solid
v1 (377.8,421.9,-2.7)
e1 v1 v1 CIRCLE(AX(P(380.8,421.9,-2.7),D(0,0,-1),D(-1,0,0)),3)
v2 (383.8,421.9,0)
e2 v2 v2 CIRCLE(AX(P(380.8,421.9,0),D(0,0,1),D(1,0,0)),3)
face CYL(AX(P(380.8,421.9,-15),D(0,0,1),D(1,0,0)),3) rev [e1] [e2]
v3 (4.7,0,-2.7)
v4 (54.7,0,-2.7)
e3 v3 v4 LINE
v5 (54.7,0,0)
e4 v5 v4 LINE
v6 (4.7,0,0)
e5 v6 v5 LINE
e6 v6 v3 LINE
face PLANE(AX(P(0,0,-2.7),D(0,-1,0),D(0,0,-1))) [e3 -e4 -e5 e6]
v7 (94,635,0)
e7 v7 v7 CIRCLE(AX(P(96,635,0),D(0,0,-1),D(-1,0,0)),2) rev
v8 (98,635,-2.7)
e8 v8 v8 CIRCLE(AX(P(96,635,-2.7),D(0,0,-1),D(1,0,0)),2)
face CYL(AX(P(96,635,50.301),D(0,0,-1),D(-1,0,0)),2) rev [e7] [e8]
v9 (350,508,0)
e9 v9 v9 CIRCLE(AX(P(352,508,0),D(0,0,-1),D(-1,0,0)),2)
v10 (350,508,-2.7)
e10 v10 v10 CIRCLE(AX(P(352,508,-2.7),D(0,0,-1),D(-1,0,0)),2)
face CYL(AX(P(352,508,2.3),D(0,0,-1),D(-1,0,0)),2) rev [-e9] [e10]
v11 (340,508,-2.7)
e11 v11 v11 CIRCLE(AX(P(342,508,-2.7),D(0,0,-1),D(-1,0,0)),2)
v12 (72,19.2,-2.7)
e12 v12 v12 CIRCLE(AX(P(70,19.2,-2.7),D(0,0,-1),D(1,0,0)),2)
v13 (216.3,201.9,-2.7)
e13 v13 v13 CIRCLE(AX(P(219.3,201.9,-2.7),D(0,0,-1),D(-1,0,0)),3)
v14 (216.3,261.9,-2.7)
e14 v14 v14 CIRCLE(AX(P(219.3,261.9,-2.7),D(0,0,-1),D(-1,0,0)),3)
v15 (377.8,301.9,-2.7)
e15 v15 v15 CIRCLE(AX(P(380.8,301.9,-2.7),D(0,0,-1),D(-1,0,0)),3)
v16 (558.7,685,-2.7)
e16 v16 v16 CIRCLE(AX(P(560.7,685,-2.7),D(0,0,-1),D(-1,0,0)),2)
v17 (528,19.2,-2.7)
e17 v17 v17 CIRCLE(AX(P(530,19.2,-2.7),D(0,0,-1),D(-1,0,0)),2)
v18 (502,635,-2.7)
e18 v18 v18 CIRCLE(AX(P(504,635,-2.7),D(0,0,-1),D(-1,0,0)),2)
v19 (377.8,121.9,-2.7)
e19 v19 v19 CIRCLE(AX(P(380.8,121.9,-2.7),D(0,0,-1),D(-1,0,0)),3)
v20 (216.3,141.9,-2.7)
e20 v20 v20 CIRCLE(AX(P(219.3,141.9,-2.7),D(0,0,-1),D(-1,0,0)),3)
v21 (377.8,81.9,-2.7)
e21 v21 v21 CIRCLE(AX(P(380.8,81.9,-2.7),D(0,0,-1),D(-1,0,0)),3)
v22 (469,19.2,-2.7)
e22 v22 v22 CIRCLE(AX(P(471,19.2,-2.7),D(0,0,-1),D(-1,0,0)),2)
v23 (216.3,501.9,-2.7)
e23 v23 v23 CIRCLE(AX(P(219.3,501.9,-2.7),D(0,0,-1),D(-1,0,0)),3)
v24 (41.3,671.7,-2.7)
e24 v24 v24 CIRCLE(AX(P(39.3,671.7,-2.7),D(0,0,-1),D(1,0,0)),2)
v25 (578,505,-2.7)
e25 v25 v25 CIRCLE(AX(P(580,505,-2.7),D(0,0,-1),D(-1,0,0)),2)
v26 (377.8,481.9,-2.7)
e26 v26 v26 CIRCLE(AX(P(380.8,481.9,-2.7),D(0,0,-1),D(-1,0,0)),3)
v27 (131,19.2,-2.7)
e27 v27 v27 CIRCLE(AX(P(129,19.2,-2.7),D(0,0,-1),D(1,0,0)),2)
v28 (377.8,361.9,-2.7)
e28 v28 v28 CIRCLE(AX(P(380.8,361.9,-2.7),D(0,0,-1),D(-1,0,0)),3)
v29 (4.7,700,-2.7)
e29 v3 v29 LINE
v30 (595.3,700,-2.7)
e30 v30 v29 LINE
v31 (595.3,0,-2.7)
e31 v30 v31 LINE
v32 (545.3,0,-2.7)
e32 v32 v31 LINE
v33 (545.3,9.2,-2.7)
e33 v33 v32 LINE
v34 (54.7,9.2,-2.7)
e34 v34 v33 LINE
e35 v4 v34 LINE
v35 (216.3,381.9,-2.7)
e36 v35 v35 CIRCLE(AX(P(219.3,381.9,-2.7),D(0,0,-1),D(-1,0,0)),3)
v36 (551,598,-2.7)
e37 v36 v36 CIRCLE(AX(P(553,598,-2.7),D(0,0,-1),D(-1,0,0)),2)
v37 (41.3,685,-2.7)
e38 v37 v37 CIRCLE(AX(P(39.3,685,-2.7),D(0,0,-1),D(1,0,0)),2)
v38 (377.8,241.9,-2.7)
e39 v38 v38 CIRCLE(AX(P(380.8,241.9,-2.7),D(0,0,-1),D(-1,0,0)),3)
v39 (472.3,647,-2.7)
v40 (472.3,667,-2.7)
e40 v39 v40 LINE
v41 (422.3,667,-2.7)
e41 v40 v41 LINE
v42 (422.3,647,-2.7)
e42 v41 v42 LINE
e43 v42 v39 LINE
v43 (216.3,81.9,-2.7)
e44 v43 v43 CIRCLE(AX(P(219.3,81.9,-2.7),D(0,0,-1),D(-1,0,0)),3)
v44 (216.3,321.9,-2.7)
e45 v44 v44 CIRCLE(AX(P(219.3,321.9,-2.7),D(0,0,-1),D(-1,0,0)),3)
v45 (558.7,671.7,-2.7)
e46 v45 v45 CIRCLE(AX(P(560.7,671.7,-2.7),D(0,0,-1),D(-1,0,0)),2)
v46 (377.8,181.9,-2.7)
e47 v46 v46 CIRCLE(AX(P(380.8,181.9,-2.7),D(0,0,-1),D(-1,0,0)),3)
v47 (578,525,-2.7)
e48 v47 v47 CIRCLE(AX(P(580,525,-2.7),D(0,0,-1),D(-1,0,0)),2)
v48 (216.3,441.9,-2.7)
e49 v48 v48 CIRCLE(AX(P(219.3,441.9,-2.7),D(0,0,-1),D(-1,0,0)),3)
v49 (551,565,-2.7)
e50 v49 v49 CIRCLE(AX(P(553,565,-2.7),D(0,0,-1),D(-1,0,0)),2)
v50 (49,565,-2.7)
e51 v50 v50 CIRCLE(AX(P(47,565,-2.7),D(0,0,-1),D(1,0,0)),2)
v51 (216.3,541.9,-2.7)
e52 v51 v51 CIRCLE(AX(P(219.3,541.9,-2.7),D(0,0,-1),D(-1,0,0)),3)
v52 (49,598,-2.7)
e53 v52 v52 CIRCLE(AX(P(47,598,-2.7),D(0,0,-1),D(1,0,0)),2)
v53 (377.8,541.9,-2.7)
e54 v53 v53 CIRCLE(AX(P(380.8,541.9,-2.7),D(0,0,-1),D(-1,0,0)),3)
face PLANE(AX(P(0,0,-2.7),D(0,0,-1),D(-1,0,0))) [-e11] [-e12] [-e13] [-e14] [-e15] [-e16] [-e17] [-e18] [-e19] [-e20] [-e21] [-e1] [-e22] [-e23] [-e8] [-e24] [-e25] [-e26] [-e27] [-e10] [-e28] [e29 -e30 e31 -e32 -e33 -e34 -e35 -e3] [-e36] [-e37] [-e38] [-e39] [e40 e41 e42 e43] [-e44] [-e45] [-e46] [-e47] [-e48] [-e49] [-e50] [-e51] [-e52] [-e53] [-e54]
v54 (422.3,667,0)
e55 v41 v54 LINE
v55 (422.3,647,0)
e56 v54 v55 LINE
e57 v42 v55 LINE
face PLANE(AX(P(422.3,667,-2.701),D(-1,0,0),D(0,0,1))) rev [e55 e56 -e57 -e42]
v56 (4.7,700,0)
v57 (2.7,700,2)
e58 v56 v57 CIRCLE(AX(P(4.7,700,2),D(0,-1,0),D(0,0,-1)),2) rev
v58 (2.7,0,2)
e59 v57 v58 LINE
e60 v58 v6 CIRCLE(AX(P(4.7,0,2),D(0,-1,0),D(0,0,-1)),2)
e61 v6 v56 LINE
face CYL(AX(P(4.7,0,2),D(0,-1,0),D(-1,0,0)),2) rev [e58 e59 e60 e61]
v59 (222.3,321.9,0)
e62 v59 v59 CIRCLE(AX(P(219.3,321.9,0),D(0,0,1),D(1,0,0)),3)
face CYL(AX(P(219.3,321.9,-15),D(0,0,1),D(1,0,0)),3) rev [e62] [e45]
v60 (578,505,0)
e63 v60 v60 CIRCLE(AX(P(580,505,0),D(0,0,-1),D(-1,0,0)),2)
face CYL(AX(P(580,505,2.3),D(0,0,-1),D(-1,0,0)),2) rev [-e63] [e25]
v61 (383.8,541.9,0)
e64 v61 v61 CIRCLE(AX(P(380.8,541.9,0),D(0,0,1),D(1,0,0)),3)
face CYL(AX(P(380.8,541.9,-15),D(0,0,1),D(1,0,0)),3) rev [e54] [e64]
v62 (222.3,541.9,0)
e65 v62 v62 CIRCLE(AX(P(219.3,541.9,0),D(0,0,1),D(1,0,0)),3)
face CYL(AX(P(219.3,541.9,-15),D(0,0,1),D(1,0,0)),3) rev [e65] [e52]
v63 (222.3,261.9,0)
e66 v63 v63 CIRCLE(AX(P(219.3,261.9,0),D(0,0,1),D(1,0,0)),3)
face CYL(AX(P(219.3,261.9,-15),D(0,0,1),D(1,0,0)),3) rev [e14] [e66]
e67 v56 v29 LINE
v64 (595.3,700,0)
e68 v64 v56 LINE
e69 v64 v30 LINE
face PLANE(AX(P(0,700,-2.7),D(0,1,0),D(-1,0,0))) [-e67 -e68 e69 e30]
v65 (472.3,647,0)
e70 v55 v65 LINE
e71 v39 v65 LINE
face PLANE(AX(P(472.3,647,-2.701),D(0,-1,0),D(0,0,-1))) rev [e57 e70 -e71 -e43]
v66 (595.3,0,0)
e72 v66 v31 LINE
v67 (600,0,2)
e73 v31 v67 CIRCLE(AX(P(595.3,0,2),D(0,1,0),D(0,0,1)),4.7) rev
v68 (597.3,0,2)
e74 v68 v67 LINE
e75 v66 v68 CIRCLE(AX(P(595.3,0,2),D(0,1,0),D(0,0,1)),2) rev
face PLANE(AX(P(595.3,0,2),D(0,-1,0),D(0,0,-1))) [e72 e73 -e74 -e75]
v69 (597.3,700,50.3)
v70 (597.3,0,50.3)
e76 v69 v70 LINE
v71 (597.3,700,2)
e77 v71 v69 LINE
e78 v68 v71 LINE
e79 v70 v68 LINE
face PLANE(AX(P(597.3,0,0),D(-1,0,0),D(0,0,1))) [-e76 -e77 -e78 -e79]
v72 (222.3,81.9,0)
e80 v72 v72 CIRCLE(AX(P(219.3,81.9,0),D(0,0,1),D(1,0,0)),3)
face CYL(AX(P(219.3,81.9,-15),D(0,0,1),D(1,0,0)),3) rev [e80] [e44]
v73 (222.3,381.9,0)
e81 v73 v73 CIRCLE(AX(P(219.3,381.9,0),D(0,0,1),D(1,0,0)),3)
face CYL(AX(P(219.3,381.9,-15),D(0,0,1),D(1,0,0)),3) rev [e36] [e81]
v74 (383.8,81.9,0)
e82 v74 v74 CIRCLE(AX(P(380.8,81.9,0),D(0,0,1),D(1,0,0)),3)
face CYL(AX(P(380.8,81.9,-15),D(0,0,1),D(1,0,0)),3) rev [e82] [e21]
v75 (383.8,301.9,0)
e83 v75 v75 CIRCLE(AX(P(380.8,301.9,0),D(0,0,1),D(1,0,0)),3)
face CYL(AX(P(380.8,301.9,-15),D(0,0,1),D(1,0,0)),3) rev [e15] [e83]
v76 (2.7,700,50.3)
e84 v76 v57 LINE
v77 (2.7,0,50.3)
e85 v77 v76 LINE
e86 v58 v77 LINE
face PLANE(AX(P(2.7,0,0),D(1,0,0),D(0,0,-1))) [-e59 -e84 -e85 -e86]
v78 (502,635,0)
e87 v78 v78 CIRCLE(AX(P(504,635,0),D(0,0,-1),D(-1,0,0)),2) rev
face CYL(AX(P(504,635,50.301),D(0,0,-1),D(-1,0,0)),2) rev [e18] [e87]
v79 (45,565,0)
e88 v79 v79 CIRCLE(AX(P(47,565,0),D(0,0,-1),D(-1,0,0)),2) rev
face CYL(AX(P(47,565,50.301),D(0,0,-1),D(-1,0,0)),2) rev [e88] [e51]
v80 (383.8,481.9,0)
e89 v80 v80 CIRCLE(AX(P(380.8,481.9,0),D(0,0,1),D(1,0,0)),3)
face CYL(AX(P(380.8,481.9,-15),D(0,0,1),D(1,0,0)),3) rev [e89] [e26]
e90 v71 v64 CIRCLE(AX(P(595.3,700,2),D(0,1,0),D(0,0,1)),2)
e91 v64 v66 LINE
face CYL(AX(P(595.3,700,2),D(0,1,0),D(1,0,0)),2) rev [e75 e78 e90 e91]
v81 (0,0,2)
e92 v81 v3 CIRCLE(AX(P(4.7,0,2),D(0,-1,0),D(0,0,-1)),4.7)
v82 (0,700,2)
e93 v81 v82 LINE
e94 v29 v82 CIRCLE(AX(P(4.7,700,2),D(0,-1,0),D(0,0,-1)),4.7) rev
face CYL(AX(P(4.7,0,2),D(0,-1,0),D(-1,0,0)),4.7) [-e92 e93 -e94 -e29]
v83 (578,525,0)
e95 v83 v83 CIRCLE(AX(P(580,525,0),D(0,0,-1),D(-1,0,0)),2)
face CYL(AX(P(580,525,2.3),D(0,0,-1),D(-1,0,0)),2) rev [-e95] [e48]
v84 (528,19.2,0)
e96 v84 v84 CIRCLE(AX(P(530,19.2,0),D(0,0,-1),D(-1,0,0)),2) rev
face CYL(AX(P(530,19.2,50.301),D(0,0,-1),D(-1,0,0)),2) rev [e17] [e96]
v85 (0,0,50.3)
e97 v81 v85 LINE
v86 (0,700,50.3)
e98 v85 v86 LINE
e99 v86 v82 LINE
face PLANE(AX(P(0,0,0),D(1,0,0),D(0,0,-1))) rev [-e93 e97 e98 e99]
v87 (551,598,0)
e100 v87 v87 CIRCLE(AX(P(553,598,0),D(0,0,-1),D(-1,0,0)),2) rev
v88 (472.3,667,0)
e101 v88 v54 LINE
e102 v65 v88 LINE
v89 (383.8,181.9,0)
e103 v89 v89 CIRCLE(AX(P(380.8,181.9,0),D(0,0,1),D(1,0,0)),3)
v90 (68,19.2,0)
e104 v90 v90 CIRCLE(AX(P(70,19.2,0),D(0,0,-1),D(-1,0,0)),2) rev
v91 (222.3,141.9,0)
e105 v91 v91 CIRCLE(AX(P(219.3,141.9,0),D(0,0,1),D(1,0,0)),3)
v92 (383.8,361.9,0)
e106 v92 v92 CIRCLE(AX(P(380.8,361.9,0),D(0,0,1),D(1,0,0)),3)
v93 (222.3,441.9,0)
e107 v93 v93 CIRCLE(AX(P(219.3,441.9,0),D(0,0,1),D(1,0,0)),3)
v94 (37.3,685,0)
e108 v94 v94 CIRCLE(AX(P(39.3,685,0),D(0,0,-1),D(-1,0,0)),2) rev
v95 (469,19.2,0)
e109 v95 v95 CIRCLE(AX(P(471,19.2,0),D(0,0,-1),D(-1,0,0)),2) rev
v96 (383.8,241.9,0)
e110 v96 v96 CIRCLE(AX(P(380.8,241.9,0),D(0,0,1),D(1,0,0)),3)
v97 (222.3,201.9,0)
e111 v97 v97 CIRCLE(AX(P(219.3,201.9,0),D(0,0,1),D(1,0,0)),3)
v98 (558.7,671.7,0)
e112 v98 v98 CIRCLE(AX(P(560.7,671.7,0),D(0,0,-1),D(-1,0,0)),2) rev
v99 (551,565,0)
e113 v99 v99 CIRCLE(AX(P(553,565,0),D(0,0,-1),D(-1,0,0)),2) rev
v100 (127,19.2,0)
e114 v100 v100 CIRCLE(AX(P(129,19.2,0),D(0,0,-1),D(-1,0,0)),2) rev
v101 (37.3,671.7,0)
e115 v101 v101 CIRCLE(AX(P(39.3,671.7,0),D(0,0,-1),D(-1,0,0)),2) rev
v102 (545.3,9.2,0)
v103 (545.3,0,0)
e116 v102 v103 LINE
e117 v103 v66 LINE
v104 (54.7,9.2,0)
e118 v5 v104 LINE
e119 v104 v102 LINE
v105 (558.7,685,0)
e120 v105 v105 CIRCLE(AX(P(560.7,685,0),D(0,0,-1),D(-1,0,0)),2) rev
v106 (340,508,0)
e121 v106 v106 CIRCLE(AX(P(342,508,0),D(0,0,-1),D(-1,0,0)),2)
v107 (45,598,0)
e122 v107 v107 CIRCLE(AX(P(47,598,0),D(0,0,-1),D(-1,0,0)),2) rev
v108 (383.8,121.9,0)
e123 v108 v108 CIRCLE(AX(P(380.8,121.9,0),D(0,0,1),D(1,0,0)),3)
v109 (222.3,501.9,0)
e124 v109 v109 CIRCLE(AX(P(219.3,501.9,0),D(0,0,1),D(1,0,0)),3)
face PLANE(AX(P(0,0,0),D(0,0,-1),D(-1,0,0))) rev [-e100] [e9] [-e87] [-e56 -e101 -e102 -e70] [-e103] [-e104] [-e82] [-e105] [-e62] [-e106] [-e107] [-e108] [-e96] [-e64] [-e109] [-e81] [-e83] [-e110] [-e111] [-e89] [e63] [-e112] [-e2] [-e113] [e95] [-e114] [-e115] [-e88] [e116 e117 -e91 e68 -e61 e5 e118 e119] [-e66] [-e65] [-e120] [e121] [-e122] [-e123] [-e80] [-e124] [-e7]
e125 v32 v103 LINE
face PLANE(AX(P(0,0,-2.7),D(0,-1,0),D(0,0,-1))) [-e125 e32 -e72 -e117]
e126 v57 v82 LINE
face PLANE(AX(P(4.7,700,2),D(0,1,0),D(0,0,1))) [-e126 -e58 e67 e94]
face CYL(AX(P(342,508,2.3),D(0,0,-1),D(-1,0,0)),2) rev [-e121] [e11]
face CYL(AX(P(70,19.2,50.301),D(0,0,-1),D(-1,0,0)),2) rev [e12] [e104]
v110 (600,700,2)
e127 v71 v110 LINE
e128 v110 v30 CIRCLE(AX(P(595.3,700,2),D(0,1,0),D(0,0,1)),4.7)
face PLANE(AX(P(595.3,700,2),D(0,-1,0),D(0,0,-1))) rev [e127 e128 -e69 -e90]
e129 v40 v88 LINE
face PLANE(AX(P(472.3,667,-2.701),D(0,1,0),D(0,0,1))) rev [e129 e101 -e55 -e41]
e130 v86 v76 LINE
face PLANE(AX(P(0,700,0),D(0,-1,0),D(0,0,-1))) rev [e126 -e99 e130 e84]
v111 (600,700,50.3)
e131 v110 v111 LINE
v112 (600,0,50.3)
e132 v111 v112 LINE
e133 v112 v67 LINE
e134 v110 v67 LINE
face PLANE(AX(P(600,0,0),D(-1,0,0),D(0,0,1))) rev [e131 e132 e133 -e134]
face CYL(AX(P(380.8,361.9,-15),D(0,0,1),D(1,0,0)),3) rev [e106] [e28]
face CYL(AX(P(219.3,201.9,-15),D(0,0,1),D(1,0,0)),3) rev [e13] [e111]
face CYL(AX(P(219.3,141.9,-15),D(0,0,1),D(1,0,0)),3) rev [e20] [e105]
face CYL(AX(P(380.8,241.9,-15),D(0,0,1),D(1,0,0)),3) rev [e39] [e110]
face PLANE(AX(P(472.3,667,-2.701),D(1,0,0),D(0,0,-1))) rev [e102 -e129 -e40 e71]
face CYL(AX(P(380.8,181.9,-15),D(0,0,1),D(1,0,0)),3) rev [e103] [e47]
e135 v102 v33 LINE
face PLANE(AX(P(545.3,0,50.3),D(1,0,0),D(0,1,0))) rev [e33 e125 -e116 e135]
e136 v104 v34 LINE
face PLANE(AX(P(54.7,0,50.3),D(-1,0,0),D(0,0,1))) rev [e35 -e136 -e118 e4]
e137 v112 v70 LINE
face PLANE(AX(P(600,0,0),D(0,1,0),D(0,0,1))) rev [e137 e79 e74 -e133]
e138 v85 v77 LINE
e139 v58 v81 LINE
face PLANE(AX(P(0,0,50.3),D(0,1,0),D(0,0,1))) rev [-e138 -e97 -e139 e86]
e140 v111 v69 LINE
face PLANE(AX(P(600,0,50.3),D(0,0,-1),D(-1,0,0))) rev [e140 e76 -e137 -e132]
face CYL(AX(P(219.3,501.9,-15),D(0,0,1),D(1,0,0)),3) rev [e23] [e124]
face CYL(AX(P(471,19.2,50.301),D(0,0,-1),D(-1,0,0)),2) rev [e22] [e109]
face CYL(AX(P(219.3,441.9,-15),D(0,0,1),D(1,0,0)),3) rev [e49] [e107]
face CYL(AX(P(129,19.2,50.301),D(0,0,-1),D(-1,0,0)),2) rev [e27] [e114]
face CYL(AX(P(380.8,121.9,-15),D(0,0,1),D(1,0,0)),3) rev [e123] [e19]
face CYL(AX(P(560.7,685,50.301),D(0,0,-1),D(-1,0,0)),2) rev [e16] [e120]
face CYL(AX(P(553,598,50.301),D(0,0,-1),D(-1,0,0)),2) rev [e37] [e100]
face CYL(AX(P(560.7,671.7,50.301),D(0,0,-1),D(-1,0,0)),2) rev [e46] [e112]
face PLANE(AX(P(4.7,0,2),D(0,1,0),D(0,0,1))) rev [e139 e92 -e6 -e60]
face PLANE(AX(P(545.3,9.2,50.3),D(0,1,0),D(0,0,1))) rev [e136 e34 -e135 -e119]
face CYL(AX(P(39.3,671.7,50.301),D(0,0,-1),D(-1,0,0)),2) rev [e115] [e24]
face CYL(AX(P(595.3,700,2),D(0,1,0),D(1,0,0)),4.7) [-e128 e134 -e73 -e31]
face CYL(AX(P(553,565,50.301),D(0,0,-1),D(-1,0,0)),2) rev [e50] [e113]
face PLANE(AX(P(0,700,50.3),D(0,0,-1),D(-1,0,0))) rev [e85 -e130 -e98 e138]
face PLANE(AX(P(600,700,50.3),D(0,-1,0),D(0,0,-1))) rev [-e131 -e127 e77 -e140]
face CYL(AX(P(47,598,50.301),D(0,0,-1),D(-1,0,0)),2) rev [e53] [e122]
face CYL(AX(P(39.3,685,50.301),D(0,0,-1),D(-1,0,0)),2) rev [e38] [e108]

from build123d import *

# Parameters (mm, degrees)
SKETCH1_W                      = 600
SKETCH1_H                      = 700
BASE_FLANGE1_DEPTH             = 2.7
EDGE_FLANGE1_STRIP_W           = 14.8
EDGE_FLANGE1_STRIP_H           = 2.7
EDGE_FLANGE1_STRIP_CUT_DEPTH   = 700
EDGE_FLANGE1_STRIP_2_W         = 14.8
EDGE_FLANGE1_STRIP_2_H         = 2.7
EDGE_FLANGE1_STRIP_CUT_2_DEPTH = 700
EDGE_FLANGE1_DEPTH             = 700
EDGE_FLANGE1_BEND_DEPTH        = 700
CUT_EXTRUDE1_REACH             = 925.326
SKETCH12_W                     = 50
SKETCH12_H                     = 20
SKETCH13_W                     = 490.6
SKETCH13_H                     = 9.2
CUT_EXTRUDE2_DEPTH             = 924.476583352
CUT_EXTRUDE6_REACH             = 925.477
SKETCH17_R                     = 2
CUT_EXTRUDE7_START             = -2.7
CUT_EXTRUDE7_OUTLINE_R         = 2
CUT_EXTRUDE7_DEPTH             = 2.7
CUT_EXTRUDE10_START            = -2.7
CUT_EXTRUDE10_OUTLINE_R        = 3
CUT_EXTRUDE10_DEPTH            = 2.7


# Read off the part's stored shape, not the designer's step: Cut-Extrude7, Cut-Extrude10
# Sheet-metal steps are written as plain solids
with BuildPart() as part:
    # Sketch1 → Base-Flange1 (new body)
    with BuildSketch(Plane.XY):
        with Locations((300, 350)):
            Rectangle(SKETCH1_W, SKETCH1_H)
    extrude(amount=-BASE_FLANGE1_DEPTH)

    # Edge-Flange1 strip (across the edge) → Edge-Flange1 strip cut (cut)
    with BuildSketch(Plane(origin=(600, 0, 0), x_dir=(-1, 0, 0), z_dir=(0, 1, 0))):
        with Locations((-2.7, -1.35)):
            Rectangle(EDGE_FLANGE1_STRIP_W, EDGE_FLANGE1_STRIP_H)
    extrude(amount=EDGE_FLANGE1_STRIP_CUT_DEPTH, mode=Mode.SUBTRACT)

    # Edge-Flange1 strip 2 (across the edge) → Edge-Flange1 strip cut 2 (cut)
    with BuildSketch(Plane.XZ.offset(-700)):
        with Locations((-2.7, -1.35)):
            Rectangle(EDGE_FLANGE1_STRIP_2_W, EDGE_FLANGE1_STRIP_2_H)
    extrude(amount=EDGE_FLANGE1_STRIP_CUT_2_DEPTH, mode=Mode.SUBTRACT)

    # Edge-Flange1 section (across the edge) → Edge-Flange1 (add)
    with BuildSketch(Plane(origin=(600, 0, 0), x_dir=(-1, 0, 0), z_dir=(0, 1, 0))):
        with BuildLine():
            Line((0, 2), (0, 50.3))
            Line((0, 50.3), (2.7, 50.3))
            Line((2.7, 50.3), (2.7, 2))
            ThreePointArc((2.7, 2), (3.285786438, 0.585786438), (4.7, 0))
            Line((4.7, 0), (4.7, -2.7))
            ThreePointArc((4.7, -2.7), (1.376598128, -1.323401872), (0, 2))
        make_face()
    extrude(amount=EDGE_FLANGE1_DEPTH)

    # Edge-Flange1 section 2 (across the edge) → Edge-Flange1 bend (add)
    with BuildSketch(Plane.XZ.offset(-700)):
        with BuildLine():
            Line((0, 2), (0, 50.3))
            Line((0, 50.3), (2.7, 50.3))
            Line((2.7, 50.3), (2.7, 2))
            ThreePointArc((2.7, 2), (3.285786438, 0.585786438), (4.7, 0))
            Line((4.7, 0), (4.7, -2.7))
            ThreePointArc((4.7, -2.7), (1.376598128, -1.323401872), (0, 2))
        make_face()
    extrude(amount=EDGE_FLANGE1_BEND_DEPTH)

    # Sketch12 → Cut-Extrude1 (cut, up to next)
    with BuildSketch(Plane.XY, mode=Mode.PRIVATE) as cut_extrude1_sk1:
        with Locations((447.3, 657)):
            Rectangle(SKETCH12_W, SKETCH12_H)
    cut_extrude1_tool1 = extrude(cut_extrude1_sk1.sketch, amount=-CUT_EXTRUDE1_REACH, mode=Mode.PRIVATE) & part.part
    add(cut_extrude1_tool1.solids().sort_by_distance((447.3, 657, 0))[0], mode=Mode.SUBTRACT)

    # Sketch13 → Cut-Extrude2 (cut, through all)
    with BuildSketch(Plane(origin=(0, 0, -2.7), x_dir=(-1, 0, 0), z_dir=(0, 0, -1))):
        with Locations((-300, 4.6)):
            Rectangle(SKETCH13_W, SKETCH13_H)
    extrude(amount=-CUT_EXTRUDE2_DEPTH, mode=Mode.SUBTRACT)

    # Sketch17 → Cut-Extrude6 (cut, up to next)
    with BuildSketch(Plane(origin=(0, 0, -2.7), x_dir=(-1, 0, 0), z_dir=(0, 0, -1)), mode=Mode.PRIVATE) as cut_extrude6_sk1:
        with Locations((-560.7, 685)):
            Circle(SKETCH17_R)
    cut_extrude6_tool1 = extrude(cut_extrude6_sk1.sketch, amount=-CUT_EXTRUDE6_REACH, mode=Mode.PRIVATE) & part.part
    # Sketch17 → Cut-Extrude6 (cut, up to next)
    with BuildSketch(Plane(origin=(0, 0, -2.7), x_dir=(-1, 0, 0), z_dir=(0, 0, -1)), mode=Mode.PRIVATE) as cut_extrude6_sk2:
        with Locations((-560.7, 671.7)):
            Circle(SKETCH17_R)
    cut_extrude6_tool2 = extrude(cut_extrude6_sk2.sketch, amount=-CUT_EXTRUDE6_REACH, mode=Mode.PRIVATE) & part.part
    # Sketch17 → Cut-Extrude6 (cut, up to next)
    with BuildSketch(Plane(origin=(0, 0, -2.7), x_dir=(-1, 0, 0), z_dir=(0, 0, -1)), mode=Mode.PRIVATE) as cut_extrude6_sk3:
        with Locations((-504, 635)):
            Circle(SKETCH17_R)
    cut_extrude6_tool3 = extrude(cut_extrude6_sk3.sketch, amount=-CUT_EXTRUDE6_REACH, mode=Mode.PRIVATE) & part.part
    # Sketch17 → Cut-Extrude6 (cut, up to next)
    with BuildSketch(Plane(origin=(0, 0, -2.7), x_dir=(-1, 0, 0), z_dir=(0, 0, -1)), mode=Mode.PRIVATE) as cut_extrude6_sk4:
        with Locations((-553, 598)):
            Circle(SKETCH17_R)
    cut_extrude6_tool4 = extrude(cut_extrude6_sk4.sketch, amount=-CUT_EXTRUDE6_REACH, mode=Mode.PRIVATE) & part.part
    # Sketch17 → Cut-Extrude6 (cut, up to next)
    with BuildSketch(Plane(origin=(0, 0, -2.7), x_dir=(-1, 0, 0), z_dir=(0, 0, -1)), mode=Mode.PRIVATE) as cut_extrude6_sk5:
        with Locations((-553, 565)):
            Circle(SKETCH17_R)
    cut_extrude6_tool5 = extrude(cut_extrude6_sk5.sketch, amount=-CUT_EXTRUDE6_REACH, mode=Mode.PRIVATE) & part.part
    # Sketch17 → Cut-Extrude6 (cut, up to next)
    with BuildSketch(Plane(origin=(0, 0, -2.7), x_dir=(-1, 0, 0), z_dir=(0, 0, -1)), mode=Mode.PRIVATE) as cut_extrude6_sk6:
        with Locations((-530, 19.2)):
            Circle(SKETCH17_R)
    cut_extrude6_tool6 = extrude(cut_extrude6_sk6.sketch, amount=-CUT_EXTRUDE6_REACH, mode=Mode.PRIVATE) & part.part
    # Sketch17 → Cut-Extrude6 (cut, up to next)
    with BuildSketch(Plane(origin=(0, 0, -2.7), x_dir=(-1, 0, 0), z_dir=(0, 0, -1)), mode=Mode.PRIVATE) as cut_extrude6_sk7:
        with Locations((-471, 19.2)):
            Circle(SKETCH17_R)
    cut_extrude6_tool7 = extrude(cut_extrude6_sk7.sketch, amount=-CUT_EXTRUDE6_REACH, mode=Mode.PRIVATE) & part.part
    # Sketch17 → Cut-Extrude6 (cut, up to next)
    with BuildSketch(Plane(origin=(0, 0, -2.7), x_dir=(-1, 0, 0), z_dir=(0, 0, -1)), mode=Mode.PRIVATE) as cut_extrude6_sk8:
        with Locations((-129, 19.2)):
            Circle(SKETCH17_R)
    cut_extrude6_tool8 = extrude(cut_extrude6_sk8.sketch, amount=-CUT_EXTRUDE6_REACH, mode=Mode.PRIVATE) & part.part
    # Sketch17 → Cut-Extrude6 (cut, up to next)
    with BuildSketch(Plane(origin=(0, 0, -2.7), x_dir=(-1, 0, 0), z_dir=(0, 0, -1)), mode=Mode.PRIVATE) as cut_extrude6_sk9:
        with Locations((-70, 19.2)):
            Circle(SKETCH17_R)
    cut_extrude6_tool9 = extrude(cut_extrude6_sk9.sketch, amount=-CUT_EXTRUDE6_REACH, mode=Mode.PRIVATE) & part.part
    # Sketch17 → Cut-Extrude6 (cut, up to next)
    with BuildSketch(Plane(origin=(0, 0, -2.7), x_dir=(-1, 0, 0), z_dir=(0, 0, -1)), mode=Mode.PRIVATE) as cut_extrude6_sk10:
        with Locations((-47, 565)):
            Circle(SKETCH17_R)
    cut_extrude6_tool10 = extrude(cut_extrude6_sk10.sketch, amount=-CUT_EXTRUDE6_REACH, mode=Mode.PRIVATE) & part.part
    # Sketch17 → Cut-Extrude6 (cut, up to next)
    with BuildSketch(Plane(origin=(0, 0, -2.7), x_dir=(-1, 0, 0), z_dir=(0, 0, -1)), mode=Mode.PRIVATE) as cut_extrude6_sk11:
        with Locations((-47, 598)):
            Circle(SKETCH17_R)
    cut_extrude6_tool11 = extrude(cut_extrude6_sk11.sketch, amount=-CUT_EXTRUDE6_REACH, mode=Mode.PRIVATE) & part.part
    # Sketch17 → Cut-Extrude6 (cut, up to next)
    with BuildSketch(Plane(origin=(0, 0, -2.7), x_dir=(-1, 0, 0), z_dir=(0, 0, -1)), mode=Mode.PRIVATE) as cut_extrude6_sk12:
        with Locations((-96, 635)):
            Circle(SKETCH17_R)
    cut_extrude6_tool12 = extrude(cut_extrude6_sk12.sketch, amount=-CUT_EXTRUDE6_REACH, mode=Mode.PRIVATE) & part.part
    # Sketch17 → Cut-Extrude6 (cut, up to next)
    with BuildSketch(Plane(origin=(0, 0, -2.7), x_dir=(-1, 0, 0), z_dir=(0, 0, -1)), mode=Mode.PRIVATE) as cut_extrude6_sk13:
        with Locations((-39.3, 671.7)):
            Circle(SKETCH17_R)
    cut_extrude6_tool13 = extrude(cut_extrude6_sk13.sketch, amount=-CUT_EXTRUDE6_REACH, mode=Mode.PRIVATE) & part.part
    # Sketch17 → Cut-Extrude6 (cut, up to next)
    with BuildSketch(Plane(origin=(0, 0, -2.7), x_dir=(-1, 0, 0), z_dir=(0, 0, -1)), mode=Mode.PRIVATE) as cut_extrude6_sk14:
        with Locations((-39.3, 685)):
            Circle(SKETCH17_R)
    cut_extrude6_tool14 = extrude(cut_extrude6_sk14.sketch, amount=-CUT_EXTRUDE6_REACH, mode=Mode.PRIVATE) & part.part
    add(cut_extrude6_tool1.solids().sort_by_distance((560.7, 685, -2.7))[0], mode=Mode.SUBTRACT)
    add(cut_extrude6_tool2.solids().sort_by_distance((560.7, 671.7, -2.7))[0], mode=Mode.SUBTRACT)
    add(cut_extrude6_tool3.solids().sort_by_distance((504, 635, -2.7))[0], mode=Mode.SUBTRACT)
    add(cut_extrude6_tool4.solids().sort_by_distance((553, 598, -2.7))[0], mode=Mode.SUBTRACT)
    add(cut_extrude6_tool5.solids().sort_by_distance((553, 565, -2.7))[0], mode=Mode.SUBTRACT)
    add(cut_extrude6_tool6.solids().sort_by_distance((530, 19.2, -2.7))[0], mode=Mode.SUBTRACT)
    add(cut_extrude6_tool7.solids().sort_by_distance((471, 19.2, -2.7))[0], mode=Mode.SUBTRACT)
    add(cut_extrude6_tool8.solids().sort_by_distance((129, 19.2, -2.7))[0], mode=Mode.SUBTRACT)
    add(cut_extrude6_tool9.solids().sort_by_distance((70, 19.2, -2.7))[0], mode=Mode.SUBTRACT)
    add(cut_extrude6_tool10.solids().sort_by_distance((47, 565, -2.7))[0], mode=Mode.SUBTRACT)
    add(cut_extrude6_tool11.solids().sort_by_distance((47, 598, -2.7))[0], mode=Mode.SUBTRACT)
    add(cut_extrude6_tool12.solids().sort_by_distance((96, 635, -2.7))[0], mode=Mode.SUBTRACT)
    add(cut_extrude6_tool13.solids().sort_by_distance((39.3, 671.7, -2.7))[0], mode=Mode.SUBTRACT)
    add(cut_extrude6_tool14.solids().sort_by_distance((39.3, 685, -2.7))[0], mode=Mode.SUBTRACT)

    # Cut-Extrude7 outline → Cut-Extrude7 (cut)
    with BuildSketch(Plane.XY.offset(CUT_EXTRUDE7_START)):
        with Locations((352, 508)):
            Circle(CUT_EXTRUDE7_OUTLINE_R)
        with Locations((580, 505)):
            Circle(CUT_EXTRUDE7_OUTLINE_R)
        with Locations((580, 525)):
            Circle(CUT_EXTRUDE7_OUTLINE_R)
        with Locations((342, 508)):
            Circle(CUT_EXTRUDE7_OUTLINE_R)
    extrude(amount=CUT_EXTRUDE7_DEPTH, mode=Mode.SUBTRACT)

    # Cut-Extrude10 outline → Cut-Extrude10 (cut)
    with BuildSketch(Plane.XY.offset(CUT_EXTRUDE10_START)):
        with Locations((219.3, 541.9)):
            Circle(CUT_EXTRUDE10_OUTLINE_R)
        with Locations((380.8, 121.9)):
            Circle(CUT_EXTRUDE10_OUTLINE_R)
        with Locations((219.3, 261.9)):
            Circle(CUT_EXTRUDE10_OUTLINE_R)
        with Locations((219.3, 201.9)):
            Circle(CUT_EXTRUDE10_OUTLINE_R)
        with Locations((380.8, 181.9)):
            Circle(CUT_EXTRUDE10_OUTLINE_R)
        with Locations((380.8, 241.9)):
            Circle(CUT_EXTRUDE10_OUTLINE_R)
        with Locations((380.8, 301.9)):
            Circle(CUT_EXTRUDE10_OUTLINE_R)
        with Locations((219.3, 141.9)):
            Circle(CUT_EXTRUDE10_OUTLINE_R)
        with Locations((219.3, 81.9)):
            Circle(CUT_EXTRUDE10_OUTLINE_R)
        with Locations((380.8, 81.9)):
            Circle(CUT_EXTRUDE10_OUTLINE_R)
        with Locations((219.3, 321.9)):
            Circle(CUT_EXTRUDE10_OUTLINE_R)
        with Locations((380.8, 361.9)):
            Circle(CUT_EXTRUDE10_OUTLINE_R)
        with Locations((219.3, 381.9)):
            Circle(CUT_EXTRUDE10_OUTLINE_R)
        with Locations((380.8, 421.9)):
            Circle(CUT_EXTRUDE10_OUTLINE_R)
        with Locations((219.3, 441.9)):
            Circle(CUT_EXTRUDE10_OUTLINE_R)
        with Locations((380.8, 481.9)):
            Circle(CUT_EXTRUDE10_OUTLINE_R)
        with Locations((219.3, 501.9)):
            Circle(CUT_EXTRUDE10_OUTLINE_R)
        with Locations((380.8, 541.9)):
            Circle(CUT_EXTRUDE10_OUTLINE_R)
    extrude(amount=CUT_EXTRUDE10_DEPTH, mode=Mode.SUBTRACT)


solid = part.part
